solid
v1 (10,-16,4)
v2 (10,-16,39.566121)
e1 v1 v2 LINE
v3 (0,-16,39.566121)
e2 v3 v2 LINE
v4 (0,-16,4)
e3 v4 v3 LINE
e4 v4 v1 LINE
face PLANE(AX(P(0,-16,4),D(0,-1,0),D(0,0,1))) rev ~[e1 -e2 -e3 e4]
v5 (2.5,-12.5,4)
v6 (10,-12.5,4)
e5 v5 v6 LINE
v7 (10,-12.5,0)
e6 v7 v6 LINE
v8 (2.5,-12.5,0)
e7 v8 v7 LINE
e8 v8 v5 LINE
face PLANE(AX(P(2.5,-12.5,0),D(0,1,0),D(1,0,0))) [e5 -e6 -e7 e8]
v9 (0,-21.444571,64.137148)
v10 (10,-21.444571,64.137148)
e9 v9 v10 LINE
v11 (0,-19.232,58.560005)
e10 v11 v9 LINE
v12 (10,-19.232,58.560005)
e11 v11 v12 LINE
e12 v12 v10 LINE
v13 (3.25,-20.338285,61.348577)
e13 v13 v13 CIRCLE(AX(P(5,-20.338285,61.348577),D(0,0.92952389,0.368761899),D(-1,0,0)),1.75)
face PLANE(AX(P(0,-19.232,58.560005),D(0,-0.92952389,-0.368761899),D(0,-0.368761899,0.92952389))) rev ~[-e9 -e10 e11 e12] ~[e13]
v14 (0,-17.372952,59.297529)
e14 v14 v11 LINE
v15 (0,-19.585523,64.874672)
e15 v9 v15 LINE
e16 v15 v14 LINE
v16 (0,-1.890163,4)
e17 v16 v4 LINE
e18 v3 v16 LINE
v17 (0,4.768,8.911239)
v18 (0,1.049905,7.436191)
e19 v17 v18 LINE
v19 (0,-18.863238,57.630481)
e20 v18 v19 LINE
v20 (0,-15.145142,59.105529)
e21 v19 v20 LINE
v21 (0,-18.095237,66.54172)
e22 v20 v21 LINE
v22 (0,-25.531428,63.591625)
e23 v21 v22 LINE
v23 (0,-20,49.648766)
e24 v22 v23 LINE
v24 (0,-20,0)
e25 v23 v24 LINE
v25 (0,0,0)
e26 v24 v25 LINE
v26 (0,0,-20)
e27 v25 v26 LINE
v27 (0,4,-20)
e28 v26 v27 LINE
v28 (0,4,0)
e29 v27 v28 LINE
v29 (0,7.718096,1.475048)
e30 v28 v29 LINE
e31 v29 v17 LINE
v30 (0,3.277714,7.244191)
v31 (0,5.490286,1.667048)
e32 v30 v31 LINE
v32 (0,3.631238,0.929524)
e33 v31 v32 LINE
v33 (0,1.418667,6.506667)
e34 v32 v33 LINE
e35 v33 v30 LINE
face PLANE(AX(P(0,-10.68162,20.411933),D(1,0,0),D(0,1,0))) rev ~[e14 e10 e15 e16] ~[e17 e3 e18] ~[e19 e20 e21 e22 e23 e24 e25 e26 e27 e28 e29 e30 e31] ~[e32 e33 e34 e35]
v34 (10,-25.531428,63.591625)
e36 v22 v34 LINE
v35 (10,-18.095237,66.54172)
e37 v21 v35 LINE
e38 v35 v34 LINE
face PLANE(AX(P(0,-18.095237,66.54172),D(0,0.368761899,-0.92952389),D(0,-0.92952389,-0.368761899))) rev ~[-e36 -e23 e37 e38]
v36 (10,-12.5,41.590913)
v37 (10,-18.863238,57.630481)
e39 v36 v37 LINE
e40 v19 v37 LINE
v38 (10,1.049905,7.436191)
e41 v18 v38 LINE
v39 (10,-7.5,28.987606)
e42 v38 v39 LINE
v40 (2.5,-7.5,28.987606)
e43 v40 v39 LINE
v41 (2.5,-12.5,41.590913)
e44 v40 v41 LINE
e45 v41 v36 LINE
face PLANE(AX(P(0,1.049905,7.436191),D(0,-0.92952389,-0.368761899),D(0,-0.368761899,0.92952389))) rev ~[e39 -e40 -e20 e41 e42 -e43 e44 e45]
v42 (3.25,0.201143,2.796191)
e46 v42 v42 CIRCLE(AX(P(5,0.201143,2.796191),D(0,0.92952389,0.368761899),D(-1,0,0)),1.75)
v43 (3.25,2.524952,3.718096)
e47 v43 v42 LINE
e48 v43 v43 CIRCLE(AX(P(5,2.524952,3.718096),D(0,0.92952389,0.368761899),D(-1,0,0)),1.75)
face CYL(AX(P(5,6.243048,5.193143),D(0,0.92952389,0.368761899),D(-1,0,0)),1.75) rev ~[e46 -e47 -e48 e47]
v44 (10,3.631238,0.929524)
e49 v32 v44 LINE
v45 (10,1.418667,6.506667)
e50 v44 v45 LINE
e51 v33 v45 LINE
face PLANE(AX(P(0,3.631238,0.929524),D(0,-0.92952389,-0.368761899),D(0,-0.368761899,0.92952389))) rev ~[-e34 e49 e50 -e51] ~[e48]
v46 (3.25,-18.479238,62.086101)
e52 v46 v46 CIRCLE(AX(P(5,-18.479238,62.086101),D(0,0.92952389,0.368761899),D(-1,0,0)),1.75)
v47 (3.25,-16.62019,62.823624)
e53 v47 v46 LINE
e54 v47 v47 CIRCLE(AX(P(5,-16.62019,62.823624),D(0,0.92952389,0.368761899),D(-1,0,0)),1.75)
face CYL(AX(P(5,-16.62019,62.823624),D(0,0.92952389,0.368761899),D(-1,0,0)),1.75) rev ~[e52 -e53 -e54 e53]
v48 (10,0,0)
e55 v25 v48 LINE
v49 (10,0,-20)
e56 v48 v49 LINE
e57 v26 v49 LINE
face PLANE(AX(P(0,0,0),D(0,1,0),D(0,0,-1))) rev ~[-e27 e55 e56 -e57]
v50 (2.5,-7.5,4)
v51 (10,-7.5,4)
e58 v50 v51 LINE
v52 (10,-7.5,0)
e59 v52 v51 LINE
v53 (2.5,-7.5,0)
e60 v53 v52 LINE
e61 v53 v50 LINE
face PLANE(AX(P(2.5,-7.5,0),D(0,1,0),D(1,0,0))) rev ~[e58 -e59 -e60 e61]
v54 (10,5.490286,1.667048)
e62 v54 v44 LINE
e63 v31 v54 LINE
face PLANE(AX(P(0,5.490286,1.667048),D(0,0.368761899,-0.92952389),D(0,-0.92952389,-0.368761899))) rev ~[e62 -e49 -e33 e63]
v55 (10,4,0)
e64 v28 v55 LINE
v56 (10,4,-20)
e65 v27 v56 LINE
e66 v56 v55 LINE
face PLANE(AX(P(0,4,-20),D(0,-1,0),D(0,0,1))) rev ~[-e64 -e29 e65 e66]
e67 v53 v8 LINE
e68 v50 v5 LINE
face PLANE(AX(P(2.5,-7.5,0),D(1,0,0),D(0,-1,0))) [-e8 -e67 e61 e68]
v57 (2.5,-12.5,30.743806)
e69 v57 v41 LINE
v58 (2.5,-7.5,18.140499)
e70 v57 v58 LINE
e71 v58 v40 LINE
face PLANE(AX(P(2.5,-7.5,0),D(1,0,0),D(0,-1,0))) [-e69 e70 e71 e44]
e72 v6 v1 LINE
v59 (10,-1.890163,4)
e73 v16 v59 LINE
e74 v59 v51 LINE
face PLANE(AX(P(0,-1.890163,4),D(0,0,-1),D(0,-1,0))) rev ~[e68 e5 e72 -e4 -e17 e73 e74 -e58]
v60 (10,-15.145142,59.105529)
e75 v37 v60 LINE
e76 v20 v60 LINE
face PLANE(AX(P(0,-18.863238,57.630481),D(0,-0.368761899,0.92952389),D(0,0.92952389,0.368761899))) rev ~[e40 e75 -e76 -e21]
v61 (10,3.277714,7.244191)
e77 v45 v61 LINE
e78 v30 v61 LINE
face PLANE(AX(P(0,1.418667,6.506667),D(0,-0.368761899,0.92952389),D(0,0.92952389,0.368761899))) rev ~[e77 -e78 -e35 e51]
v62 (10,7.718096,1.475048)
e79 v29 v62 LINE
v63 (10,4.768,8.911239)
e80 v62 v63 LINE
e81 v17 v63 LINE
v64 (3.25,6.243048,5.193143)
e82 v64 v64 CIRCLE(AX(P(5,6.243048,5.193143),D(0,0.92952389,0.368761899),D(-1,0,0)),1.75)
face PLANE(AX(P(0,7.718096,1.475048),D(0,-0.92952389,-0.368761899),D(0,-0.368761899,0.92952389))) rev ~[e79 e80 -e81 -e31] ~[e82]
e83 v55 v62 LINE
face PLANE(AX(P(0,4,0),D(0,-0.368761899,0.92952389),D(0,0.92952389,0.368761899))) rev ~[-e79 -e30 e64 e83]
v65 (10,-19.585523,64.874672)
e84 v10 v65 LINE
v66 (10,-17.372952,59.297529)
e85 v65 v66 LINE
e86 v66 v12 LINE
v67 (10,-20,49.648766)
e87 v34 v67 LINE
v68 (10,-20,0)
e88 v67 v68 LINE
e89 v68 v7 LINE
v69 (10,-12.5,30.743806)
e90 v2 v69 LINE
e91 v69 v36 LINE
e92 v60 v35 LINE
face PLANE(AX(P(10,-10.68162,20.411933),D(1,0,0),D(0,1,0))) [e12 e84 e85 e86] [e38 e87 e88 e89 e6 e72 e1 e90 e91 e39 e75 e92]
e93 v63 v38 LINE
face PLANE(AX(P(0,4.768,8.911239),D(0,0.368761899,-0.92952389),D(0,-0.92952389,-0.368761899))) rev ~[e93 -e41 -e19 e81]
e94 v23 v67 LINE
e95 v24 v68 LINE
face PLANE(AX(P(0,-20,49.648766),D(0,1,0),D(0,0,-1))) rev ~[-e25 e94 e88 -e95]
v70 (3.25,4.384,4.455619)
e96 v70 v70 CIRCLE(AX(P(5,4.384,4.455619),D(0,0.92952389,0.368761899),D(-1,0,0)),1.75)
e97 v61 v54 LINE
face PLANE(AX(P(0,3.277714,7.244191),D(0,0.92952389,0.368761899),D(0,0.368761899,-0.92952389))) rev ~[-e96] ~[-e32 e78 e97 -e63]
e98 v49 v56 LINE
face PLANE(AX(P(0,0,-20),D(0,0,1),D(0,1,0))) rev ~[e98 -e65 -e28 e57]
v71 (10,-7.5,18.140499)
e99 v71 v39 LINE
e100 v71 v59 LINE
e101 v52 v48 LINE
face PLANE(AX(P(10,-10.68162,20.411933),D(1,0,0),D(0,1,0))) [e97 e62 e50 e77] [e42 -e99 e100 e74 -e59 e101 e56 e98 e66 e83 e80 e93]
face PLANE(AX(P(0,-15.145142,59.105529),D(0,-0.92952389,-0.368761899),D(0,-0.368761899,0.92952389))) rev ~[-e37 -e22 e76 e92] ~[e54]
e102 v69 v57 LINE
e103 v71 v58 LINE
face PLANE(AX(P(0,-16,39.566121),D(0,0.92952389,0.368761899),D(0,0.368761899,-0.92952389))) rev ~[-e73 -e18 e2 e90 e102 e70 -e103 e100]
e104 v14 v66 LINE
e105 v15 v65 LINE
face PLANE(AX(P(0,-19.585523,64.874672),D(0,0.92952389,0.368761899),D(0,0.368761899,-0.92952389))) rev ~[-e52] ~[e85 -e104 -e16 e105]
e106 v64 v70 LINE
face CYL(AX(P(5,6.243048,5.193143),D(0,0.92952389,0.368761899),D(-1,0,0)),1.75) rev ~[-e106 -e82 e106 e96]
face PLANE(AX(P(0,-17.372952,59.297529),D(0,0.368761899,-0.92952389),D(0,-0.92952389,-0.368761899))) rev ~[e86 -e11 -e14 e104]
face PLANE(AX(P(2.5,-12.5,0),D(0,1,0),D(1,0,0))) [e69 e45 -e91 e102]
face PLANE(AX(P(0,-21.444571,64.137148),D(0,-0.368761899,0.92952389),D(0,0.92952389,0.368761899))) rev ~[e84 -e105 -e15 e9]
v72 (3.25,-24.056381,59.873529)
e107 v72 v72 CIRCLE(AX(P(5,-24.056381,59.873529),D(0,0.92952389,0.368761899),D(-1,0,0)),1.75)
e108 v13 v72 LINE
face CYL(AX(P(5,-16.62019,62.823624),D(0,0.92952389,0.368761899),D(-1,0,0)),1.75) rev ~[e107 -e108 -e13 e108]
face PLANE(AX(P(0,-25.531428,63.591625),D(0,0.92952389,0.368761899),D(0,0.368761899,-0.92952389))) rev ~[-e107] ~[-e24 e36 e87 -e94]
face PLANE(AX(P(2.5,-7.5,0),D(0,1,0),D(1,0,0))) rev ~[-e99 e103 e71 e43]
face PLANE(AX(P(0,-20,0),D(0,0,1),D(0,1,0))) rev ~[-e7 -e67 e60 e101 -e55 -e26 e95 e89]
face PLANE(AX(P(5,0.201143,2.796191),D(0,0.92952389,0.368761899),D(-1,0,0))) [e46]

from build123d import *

# Parameters (mm, degrees)
F1_DEPTH = 10
F2_R     = 1.75
F3_DEPTH = 25
F4_R     = 1.75
F5_DEPTH = 6.5
F6_W     = 7.5
F6_H     = 5
F7_DEPTH = 52.6


with BuildPart() as f1:
    # F0 (on Right) → F1 (new body)
    with BuildSketch(Plane.YZ):
        Polygon((-20, 49.6487663492), (-20, 0), (0, 0), (0, -20), (4, -20), (4, 0), (3.6312381011, 0.9295238899), (1.4186667076, 6.5066672293), (1.0499048087, 7.4361911193), (-18.8632377328, 57.6304811742), (-19.2319996317, 58.5600050641), (-21.4445710252, 64.1371484036), (-21.8133329241, 65.0666722935), (-25.5314284837, 63.5916246978), align=None)
        Polygon((-16, 4), (-16, 39.5661206894), (-1.8901633999, 4), align=None, mode=Mode.SUBTRACT)
        Polygon((-18.0952373645, 66.5417198892), (-21.8133329241, 65.0666722935), (-21.4445710252, 64.1371484036), (-19.5855232454, 64.8746722014), (-17.3729518519, 59.297528862), (-19.2319996317, 58.5600050641), (-18.8632377328, 57.6304811742), (-15.1451421732, 59.1055287699), align=None)
        Polygon((3.6312381011, 0.9295238899), (4, 0), (7.7180955596, 1.4750475957), (4.7680003683, 8.9112387149), (1.0499048087, 7.4361911193), (1.4186667076, 6.5066672293), (3.2777144874, 7.2441910272), (5.4902858809, 1.6670476877), align=None)
    extrude(amount=F1_DEPTH)

    # F2 (on face) → F3 (cut)
    with BuildSketch(Plane(origin=(0, 7.1741542073, 2.8461395746), x_dir=(-1, 0, 0), z_dir=(0, 0.9295238899, 0.3687618989))):
        with Locations((-5, 64.5249524043)):
            Circle(F2_R)
    extrude(amount=-F3_DEPTH, mode=Mode.SUBTRACT)

    # F4 (on face) → F5 (cut)
    with BuildSketch(Plane(origin=(0, 7.1741542073, 2.8461395746), x_dir=(-1, 0, 0), z_dir=(0, 0.9295238899, 0.3687618989))):
        with Locations((-5, 2.5249524043)):
            Circle(F4_R)
    extrude(amount=-F5_DEPTH, mode=Mode.SUBTRACT)

    # F6 (on face) → F7 (cut)
    with BuildSketch(Plane(origin=(0, 0, 0), x_dir=(1, 0, 0), z_dir=(0, 0, -1))):
        with Locations((6.25, 10)):
            Rectangle(F6_W, F6_H)
    extrude(amount=-F7_DEPTH, mode=Mode.SUBTRACT)


solid = f1.part
